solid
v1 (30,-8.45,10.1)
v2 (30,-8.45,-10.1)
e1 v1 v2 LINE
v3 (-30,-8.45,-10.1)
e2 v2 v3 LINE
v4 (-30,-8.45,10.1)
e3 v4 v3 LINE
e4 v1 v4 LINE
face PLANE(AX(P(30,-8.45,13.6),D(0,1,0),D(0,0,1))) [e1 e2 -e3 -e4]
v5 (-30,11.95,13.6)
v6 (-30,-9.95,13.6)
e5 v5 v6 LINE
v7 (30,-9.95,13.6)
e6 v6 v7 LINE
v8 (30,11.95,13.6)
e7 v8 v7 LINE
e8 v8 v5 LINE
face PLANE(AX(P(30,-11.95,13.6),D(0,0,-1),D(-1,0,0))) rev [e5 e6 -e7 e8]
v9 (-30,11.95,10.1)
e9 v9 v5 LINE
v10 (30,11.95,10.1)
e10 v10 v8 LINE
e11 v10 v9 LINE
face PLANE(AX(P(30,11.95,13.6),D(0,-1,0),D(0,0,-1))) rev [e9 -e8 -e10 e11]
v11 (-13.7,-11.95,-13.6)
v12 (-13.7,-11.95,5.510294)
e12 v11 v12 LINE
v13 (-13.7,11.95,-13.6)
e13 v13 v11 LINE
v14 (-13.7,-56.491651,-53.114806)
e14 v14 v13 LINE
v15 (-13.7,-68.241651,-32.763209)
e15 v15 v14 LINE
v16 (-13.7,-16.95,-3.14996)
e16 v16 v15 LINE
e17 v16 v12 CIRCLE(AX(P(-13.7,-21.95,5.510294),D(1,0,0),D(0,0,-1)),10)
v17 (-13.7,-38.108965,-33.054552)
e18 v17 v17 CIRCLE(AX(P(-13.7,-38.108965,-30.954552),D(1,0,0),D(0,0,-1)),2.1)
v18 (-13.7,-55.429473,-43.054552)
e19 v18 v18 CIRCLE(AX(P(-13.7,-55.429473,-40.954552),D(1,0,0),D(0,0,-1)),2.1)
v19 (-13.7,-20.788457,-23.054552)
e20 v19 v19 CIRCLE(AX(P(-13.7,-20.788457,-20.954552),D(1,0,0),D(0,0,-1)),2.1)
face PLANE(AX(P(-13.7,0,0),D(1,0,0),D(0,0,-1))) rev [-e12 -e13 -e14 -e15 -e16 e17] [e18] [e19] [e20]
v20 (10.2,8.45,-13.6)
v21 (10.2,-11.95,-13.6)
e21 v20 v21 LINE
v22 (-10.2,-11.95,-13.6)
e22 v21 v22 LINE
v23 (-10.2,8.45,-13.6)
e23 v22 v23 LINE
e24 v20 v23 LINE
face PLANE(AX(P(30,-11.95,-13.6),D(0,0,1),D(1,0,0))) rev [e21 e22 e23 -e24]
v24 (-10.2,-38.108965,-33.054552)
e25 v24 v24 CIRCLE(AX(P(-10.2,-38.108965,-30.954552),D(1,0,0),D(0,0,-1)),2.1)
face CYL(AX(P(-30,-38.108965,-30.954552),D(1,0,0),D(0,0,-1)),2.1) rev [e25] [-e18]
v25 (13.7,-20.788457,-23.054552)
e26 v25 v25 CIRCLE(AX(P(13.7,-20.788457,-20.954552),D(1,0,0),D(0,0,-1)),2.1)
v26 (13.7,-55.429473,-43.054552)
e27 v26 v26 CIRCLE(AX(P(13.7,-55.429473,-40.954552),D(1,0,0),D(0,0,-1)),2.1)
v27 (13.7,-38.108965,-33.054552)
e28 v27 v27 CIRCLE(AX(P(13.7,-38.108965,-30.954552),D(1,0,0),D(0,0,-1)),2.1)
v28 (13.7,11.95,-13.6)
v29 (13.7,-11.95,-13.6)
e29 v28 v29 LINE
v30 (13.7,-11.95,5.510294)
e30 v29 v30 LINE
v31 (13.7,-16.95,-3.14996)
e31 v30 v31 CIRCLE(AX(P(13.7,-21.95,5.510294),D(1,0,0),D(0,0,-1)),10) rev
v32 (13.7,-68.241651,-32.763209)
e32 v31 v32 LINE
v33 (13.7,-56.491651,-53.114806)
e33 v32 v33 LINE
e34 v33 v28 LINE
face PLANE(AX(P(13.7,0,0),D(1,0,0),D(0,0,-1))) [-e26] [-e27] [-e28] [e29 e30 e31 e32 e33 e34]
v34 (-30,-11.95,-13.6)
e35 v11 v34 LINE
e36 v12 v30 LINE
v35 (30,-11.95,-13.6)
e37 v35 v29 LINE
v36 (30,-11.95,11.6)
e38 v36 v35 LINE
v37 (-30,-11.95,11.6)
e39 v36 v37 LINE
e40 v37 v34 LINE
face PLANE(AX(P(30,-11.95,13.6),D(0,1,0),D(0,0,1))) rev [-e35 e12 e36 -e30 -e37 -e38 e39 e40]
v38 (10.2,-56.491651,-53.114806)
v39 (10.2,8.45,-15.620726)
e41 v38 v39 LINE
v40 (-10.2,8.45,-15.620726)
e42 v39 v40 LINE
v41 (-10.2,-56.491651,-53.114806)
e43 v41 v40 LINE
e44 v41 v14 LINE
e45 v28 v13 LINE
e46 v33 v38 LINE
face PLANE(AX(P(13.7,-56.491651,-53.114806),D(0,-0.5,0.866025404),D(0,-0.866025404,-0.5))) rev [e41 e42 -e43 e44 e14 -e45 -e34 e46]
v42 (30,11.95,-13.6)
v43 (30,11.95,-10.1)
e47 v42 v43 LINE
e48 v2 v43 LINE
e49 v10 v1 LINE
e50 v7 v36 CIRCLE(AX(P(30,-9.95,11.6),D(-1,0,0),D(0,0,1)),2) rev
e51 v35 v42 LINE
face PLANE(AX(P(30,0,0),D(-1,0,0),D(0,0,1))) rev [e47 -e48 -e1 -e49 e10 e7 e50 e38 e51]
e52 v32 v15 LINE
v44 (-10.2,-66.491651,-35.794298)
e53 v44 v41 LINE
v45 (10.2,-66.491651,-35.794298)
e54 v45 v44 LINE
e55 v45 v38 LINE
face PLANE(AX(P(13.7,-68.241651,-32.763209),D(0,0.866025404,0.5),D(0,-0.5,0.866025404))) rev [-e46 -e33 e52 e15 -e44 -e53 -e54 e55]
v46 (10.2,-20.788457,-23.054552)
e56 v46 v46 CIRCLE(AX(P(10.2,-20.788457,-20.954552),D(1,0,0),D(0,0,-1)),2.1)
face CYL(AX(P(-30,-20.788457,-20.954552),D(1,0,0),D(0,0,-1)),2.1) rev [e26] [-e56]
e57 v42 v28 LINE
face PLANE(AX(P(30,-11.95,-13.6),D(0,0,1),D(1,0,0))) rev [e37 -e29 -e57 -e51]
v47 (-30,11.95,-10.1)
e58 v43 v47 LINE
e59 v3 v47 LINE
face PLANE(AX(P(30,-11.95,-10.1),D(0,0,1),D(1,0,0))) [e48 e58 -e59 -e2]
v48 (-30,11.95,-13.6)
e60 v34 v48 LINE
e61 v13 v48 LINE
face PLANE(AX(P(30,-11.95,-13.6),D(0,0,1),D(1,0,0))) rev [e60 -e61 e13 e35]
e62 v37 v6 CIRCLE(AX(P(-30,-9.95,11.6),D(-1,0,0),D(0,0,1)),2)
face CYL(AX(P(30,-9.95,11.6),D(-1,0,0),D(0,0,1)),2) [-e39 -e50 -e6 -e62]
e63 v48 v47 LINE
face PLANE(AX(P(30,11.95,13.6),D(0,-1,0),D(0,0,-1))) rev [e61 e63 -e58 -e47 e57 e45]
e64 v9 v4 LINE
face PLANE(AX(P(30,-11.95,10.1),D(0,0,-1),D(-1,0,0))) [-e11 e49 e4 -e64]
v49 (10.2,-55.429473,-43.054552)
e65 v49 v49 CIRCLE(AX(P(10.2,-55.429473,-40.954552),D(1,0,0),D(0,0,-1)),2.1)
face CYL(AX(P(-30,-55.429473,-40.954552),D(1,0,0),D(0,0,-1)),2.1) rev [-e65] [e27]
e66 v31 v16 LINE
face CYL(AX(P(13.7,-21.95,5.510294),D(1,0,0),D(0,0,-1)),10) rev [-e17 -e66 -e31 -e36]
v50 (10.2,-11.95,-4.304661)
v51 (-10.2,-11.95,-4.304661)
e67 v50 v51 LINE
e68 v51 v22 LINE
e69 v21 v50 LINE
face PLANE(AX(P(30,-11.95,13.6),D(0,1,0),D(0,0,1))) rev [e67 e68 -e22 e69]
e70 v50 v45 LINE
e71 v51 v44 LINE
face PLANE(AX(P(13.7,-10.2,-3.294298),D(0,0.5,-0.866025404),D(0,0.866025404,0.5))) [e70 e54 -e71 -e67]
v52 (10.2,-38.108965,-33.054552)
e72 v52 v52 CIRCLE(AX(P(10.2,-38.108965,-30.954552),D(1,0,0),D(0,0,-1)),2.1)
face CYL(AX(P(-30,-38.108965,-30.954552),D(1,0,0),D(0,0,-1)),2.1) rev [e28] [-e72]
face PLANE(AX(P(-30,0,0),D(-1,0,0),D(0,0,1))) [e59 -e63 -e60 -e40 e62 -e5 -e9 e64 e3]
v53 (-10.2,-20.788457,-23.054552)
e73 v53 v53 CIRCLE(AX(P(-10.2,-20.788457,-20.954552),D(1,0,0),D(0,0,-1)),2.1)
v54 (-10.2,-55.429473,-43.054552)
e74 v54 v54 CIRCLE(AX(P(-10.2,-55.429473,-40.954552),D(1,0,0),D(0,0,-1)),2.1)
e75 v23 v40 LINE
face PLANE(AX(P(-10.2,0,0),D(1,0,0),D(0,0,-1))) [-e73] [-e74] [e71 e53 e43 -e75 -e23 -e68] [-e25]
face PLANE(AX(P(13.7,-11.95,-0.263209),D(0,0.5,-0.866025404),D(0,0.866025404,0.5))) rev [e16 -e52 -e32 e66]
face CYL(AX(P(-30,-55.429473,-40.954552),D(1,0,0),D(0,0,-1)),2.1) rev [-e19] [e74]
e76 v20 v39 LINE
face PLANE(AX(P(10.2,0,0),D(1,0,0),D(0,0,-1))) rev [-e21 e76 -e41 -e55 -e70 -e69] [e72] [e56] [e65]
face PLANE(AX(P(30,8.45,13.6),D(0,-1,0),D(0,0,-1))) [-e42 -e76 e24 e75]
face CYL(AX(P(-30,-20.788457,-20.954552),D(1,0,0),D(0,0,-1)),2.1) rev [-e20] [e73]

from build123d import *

# Parameters (mm, degrees)
SKETCH1_W           = 27.2
SKETCH1_H           = 23.9
BOSS_EXTRUDE1_DEPTH = 30
SHELL1_T            = -3.5
BOSS_EXTRUDE2_DEPTH = 13.7
SHELL3_START        = -10.2
SHELL3_DEPTH        = 20.4
FILLET2_R           = 2
SKETCH3_R           = 2.1
CUT_EXTRUDE1_DEPTH  = 97.890637096
FILLET3_R           = 10


# Read off the part's stored shape, not the designer's step: Shell3
with BuildPart() as part:
    # Sketch1 → Boss-Extrude1 (new, symmetric)
    with BuildSketch(Plane(origin=(0, 0, 0), x_dir=(0, 0, -1), z_dir=(1, 0, 0))):
        Rectangle(SKETCH1_W, SKETCH1_H)
    extrude(amount=BOSS_EXTRUDE1_DEPTH, both=True)

    # Shell1
    shell1_openings = [part.faces().sort_by_distance(p)[0] for p in [
        (30, 0, 0),
        (-30, 0, 0),
        (0, 11.95, 0),
    ]]
    offset(amount=SHELL1_T, openings=shell1_openings, kind=Kind.INTERSECTION)

    # Sketch2 → Boss-Extrude2 (add, symmetric)
    with BuildSketch(Plane(origin=(0, 0, 0), x_dir=(0, 0, -1), z_dir=(1, 0, 0))):
        Polygon((0.263208782, -11.95), (32.763208782, -68.241651246), (53.114805771, -56.491651246), (13.6, 11.95), (13.6, -11.95), align=None)
    extrude(amount=BOSS_EXTRUDE2_DEPTH, both=True)

    # Shell3 outline → Shell3 (cut)
    with BuildSketch(Plane.YZ.offset(SHELL3_START)):
        Polygon((8.45, -15.620725942), (8.45, -13.6), (-11.95, -13.6), (-11.95, -4.304660666), (-66.491651246, -35.794297695), (-56.491651246, -53.114805771), align=None)
    extrude(amount=SHELL3_DEPTH, mode=Mode.SUBTRACT)

    # Fillet2
    fillet2_edges = [part.edges().sort_by_distance(p)[0] for p in [
        (0, -11.95, 13.6),
    ]]
    fillet(fillet2_edges, radius=FILLET2_R)

    # Sketch3 → Cut-Extrude1 (cut, through all)
    with BuildSketch(Plane(origin=(13.7, 0, 0), x_dir=(0, 0, -1), z_dir=(1, 0, 0))):
        with Locations((40.954551733, -55.429473419)):
            Circle(SKETCH3_R)
        with Locations((30.954551733, -38.108965344)):
            Circle(SKETCH3_R)
        with Locations((20.954551733, -20.788457268)):
            Circle(SKETCH3_R)
    extrude(amount=-CUT_EXTRUDE1_DEPTH, mode=Mode.SUBTRACT)

    # Fillet3
    fillet3_edges = [part.edges().sort_by_distance(p)[0] for p in [
        (0, -11.95, -0.263208782),
    ]]
    fillet(fillet3_edges, radius=FILLET3_R)


solid = part.part
